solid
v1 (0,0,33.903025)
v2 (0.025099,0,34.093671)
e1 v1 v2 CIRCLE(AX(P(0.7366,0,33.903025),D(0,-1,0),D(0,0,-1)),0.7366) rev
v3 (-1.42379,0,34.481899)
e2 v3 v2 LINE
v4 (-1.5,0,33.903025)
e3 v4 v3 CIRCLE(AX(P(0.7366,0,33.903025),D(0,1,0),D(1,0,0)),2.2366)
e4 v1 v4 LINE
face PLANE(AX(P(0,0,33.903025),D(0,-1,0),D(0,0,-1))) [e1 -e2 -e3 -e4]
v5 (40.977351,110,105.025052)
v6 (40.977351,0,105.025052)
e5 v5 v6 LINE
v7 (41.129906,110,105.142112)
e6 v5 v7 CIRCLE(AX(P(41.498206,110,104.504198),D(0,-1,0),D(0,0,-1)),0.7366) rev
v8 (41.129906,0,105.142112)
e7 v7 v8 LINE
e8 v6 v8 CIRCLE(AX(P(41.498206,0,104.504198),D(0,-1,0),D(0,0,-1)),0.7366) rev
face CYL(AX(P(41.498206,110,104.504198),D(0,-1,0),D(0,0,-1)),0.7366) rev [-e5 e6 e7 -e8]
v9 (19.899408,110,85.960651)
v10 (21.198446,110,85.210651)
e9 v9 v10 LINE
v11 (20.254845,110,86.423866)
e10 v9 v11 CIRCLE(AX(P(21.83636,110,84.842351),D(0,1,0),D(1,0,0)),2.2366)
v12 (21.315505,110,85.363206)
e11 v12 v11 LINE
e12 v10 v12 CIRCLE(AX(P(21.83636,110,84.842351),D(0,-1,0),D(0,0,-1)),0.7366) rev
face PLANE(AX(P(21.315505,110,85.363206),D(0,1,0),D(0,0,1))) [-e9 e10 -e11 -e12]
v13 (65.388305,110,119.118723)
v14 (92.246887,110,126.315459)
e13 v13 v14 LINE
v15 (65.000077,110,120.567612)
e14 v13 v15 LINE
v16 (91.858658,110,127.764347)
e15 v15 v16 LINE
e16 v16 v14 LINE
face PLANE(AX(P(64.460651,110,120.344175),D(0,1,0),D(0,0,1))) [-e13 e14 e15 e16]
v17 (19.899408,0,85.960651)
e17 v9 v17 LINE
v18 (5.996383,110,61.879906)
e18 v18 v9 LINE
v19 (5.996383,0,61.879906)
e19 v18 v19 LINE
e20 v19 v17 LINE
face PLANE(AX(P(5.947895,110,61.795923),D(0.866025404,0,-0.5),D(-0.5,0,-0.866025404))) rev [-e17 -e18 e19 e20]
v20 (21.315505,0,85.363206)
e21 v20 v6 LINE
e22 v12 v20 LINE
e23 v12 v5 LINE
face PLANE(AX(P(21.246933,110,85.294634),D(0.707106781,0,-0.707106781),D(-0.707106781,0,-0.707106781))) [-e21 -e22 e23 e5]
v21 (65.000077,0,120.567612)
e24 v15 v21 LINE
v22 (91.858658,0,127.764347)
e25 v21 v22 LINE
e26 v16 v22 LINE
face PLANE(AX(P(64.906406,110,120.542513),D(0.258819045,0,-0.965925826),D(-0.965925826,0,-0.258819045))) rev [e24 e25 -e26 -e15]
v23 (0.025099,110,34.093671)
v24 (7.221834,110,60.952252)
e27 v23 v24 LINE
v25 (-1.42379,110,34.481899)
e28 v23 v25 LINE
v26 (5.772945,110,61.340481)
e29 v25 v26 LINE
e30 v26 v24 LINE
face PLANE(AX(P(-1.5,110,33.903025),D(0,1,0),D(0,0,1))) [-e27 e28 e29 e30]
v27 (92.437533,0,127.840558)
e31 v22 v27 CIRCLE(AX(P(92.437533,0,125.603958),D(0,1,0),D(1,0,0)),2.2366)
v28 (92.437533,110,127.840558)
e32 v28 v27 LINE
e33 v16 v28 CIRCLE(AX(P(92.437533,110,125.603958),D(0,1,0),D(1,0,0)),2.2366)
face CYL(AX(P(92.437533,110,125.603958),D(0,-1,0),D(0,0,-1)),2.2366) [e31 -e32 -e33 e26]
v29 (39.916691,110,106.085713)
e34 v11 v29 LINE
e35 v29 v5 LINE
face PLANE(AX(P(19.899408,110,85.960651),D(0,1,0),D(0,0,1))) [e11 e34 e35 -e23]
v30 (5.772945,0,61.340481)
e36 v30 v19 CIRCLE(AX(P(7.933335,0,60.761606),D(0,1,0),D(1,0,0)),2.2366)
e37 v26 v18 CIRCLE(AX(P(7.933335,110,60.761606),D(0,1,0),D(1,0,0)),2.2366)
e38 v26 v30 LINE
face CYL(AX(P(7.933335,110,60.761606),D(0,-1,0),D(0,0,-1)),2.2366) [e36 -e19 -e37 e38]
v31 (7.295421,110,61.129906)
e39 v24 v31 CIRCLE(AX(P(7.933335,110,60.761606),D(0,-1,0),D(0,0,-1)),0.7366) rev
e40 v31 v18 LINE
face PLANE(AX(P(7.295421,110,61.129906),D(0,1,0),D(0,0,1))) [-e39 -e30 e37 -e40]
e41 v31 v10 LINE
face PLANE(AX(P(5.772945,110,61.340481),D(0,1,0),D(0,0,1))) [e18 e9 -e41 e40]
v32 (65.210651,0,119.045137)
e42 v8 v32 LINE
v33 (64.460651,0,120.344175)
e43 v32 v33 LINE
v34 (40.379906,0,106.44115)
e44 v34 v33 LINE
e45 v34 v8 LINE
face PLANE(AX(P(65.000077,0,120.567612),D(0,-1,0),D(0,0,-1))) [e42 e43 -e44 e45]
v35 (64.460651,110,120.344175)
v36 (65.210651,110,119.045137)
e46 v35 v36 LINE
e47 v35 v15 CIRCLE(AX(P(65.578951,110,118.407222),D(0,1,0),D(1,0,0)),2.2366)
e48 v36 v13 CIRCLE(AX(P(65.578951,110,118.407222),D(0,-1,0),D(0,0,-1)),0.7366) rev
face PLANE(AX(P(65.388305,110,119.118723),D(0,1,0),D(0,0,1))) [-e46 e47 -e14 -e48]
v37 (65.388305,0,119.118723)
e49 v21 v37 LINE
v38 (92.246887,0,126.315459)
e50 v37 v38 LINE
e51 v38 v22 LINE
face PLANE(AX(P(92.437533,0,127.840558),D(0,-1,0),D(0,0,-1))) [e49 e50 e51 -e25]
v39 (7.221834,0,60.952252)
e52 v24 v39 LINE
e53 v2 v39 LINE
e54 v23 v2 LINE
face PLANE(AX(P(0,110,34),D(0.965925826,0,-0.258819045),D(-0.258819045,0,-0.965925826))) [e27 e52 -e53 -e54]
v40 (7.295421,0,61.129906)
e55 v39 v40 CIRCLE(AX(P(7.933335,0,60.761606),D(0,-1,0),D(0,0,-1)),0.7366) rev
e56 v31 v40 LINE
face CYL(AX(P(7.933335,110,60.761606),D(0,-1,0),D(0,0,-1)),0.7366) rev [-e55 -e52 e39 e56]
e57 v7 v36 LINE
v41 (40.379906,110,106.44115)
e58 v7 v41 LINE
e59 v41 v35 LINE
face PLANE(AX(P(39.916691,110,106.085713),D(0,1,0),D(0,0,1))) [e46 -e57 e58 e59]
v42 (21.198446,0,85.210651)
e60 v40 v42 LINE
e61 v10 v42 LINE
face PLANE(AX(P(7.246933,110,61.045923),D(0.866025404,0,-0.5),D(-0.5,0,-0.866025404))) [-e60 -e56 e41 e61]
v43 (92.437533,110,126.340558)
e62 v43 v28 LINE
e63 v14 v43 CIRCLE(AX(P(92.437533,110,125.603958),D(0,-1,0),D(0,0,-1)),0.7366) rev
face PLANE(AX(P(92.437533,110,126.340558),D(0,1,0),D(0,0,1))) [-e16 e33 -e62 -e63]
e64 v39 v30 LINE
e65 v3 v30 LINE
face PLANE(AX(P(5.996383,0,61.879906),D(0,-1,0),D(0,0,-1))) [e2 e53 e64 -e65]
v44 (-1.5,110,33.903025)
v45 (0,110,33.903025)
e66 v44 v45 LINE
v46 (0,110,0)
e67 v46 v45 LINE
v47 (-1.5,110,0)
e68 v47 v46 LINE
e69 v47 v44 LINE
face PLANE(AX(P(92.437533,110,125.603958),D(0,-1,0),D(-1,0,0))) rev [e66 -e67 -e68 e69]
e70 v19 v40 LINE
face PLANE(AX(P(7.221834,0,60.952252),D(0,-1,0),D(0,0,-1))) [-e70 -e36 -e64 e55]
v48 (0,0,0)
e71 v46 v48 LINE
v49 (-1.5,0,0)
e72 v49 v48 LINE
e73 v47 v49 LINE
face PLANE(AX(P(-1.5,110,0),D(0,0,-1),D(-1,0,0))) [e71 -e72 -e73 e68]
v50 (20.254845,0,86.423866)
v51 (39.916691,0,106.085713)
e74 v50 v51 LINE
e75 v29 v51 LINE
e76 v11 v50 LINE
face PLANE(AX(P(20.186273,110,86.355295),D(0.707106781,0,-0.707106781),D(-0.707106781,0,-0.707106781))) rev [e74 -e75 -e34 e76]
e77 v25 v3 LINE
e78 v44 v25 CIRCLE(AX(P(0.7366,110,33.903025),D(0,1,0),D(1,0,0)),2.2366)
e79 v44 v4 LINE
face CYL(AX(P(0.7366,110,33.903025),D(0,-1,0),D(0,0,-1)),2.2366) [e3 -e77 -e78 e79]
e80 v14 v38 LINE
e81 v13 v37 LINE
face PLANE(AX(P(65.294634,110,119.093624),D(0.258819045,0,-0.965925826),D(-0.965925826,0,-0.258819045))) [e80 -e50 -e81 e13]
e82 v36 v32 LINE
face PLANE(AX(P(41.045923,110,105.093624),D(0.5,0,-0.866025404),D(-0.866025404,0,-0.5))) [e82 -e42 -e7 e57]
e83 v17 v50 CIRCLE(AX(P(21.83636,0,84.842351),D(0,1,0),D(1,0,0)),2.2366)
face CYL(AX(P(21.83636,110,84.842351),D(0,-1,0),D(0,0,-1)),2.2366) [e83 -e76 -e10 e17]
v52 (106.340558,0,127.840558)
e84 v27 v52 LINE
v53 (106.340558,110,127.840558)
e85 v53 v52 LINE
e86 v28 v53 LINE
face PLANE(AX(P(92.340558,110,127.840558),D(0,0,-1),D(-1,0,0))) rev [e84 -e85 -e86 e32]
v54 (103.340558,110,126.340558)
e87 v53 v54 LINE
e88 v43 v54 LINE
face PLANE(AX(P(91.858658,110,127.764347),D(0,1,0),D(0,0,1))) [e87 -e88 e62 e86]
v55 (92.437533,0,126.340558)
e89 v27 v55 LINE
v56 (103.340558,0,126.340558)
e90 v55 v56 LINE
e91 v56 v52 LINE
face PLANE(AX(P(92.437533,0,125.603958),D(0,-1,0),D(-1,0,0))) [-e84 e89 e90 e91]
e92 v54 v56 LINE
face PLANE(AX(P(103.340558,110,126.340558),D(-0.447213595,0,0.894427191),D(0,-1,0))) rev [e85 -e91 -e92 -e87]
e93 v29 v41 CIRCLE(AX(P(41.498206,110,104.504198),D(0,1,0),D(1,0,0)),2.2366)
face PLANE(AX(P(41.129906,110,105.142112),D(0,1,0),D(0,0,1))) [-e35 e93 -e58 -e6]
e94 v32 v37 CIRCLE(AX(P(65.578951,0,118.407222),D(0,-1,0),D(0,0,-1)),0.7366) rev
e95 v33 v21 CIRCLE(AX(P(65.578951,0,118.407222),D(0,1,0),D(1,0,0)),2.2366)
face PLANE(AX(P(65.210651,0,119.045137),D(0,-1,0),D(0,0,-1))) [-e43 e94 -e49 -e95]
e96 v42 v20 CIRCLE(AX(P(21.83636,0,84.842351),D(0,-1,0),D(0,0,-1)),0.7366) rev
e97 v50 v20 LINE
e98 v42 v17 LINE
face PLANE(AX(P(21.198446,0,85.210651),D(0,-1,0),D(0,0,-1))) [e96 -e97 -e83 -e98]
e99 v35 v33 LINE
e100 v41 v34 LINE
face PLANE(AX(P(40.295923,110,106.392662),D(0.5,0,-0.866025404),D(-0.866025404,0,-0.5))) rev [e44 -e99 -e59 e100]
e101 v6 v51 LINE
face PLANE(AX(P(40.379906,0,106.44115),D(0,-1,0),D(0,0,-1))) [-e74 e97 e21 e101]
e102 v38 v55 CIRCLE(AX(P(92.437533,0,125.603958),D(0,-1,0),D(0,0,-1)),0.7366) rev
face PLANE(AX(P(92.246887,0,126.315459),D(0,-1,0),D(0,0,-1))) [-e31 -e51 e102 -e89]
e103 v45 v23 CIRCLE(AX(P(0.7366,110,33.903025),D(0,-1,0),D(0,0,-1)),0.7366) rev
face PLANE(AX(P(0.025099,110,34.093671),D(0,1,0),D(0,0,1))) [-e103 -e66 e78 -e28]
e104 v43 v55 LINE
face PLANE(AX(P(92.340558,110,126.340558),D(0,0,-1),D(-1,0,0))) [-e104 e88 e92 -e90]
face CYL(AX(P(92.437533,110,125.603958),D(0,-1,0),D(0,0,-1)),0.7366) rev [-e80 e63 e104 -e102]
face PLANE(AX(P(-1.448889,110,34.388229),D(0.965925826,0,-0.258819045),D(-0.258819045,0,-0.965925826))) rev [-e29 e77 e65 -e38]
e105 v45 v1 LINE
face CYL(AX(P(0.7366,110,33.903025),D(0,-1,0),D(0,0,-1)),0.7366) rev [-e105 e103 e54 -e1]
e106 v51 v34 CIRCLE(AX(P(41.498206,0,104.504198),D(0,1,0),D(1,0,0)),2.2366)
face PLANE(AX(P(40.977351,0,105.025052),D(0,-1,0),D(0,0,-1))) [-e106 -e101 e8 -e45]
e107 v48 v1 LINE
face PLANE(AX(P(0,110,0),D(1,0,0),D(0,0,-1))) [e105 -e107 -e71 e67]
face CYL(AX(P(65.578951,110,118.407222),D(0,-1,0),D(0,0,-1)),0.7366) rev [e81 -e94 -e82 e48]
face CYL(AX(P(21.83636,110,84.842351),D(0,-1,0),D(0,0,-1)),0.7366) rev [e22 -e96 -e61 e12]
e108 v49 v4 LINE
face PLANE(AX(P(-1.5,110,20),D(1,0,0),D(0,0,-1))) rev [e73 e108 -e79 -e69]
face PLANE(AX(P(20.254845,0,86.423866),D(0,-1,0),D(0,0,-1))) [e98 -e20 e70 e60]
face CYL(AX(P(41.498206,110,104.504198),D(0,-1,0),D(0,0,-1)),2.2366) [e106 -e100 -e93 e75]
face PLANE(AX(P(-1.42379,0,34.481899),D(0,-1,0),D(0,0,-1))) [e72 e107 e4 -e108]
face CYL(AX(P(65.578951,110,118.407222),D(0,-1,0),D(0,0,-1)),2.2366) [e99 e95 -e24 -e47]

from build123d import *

# Parameters (mm, degrees)
BASE_FLANGE1_DEPTH = 110
CHAMFER1_SIZE2     = 3
CHAMFER1_SIZE      = 1.5


# Sheet-metal steps are written as plain solids
with BuildPart() as part:
    # Sketch1 → Base-Flange1 (new body)
    with BuildSketch(Plane(origin=(0, 0, 0), x_dir=(1, 0, 0), z_dir=(0, 1, 0))):
        with BuildLine():
            Line((0, 0), (0, -20))
            Line((0, -20), (0, -33.90302477))
            ThreePointArc((0, -33.90302477), (0.006301715, -33.999170363), (0.025099036, -34.093670879))
            Line((0.025099036, -34.093670879), (7.221834227, -60.952252257))
            ThreePointArc((7.221834227, -60.952252257), (7.252805527, -61.043490765), (7.295420878, -61.129906149))
            Line((7.295420878, -61.129906149), (21.198445648, -85.21065143))
            ThreePointArc((21.198445648, -85.21065143), (21.25197589, -85.290765098), (21.315505105, -85.363206285))
            Line((21.315505105, -85.363206285), (40.977351294, -105.025052473))
            ThreePointArc((40.977351294, -105.025052473), (41.04979248, -105.088581688), (41.129906149, -105.14211193))
            Line((41.129906149, -105.14211193), (65.21065143, -119.0451367))
            ThreePointArc((65.21065143, -119.0451367), (65.297066813, -119.087752052), (65.388305321, -119.118723352))
            Line((65.388305321, -119.118723352), (92.246886699, -126.315458542))
            ThreePointArc((92.246886699, -126.315458542), (92.341387215, -126.334255863), (92.437532808, -126.340557578))
            Line((92.437532808, -126.340557578), (106.340557578, -126.340557578))
            Line((106.340557578, -126.340557578), (106.340557578, -127.840557578))
            Line((106.340557578, -127.840557578), (92.437532808, -127.840557578))
            ThreePointArc((92.437532808, -127.840557578), (92.145597926, -127.821423155), (91.858658132, -127.764347281))
            Line((91.858658132, -127.764347281), (65.000076753, -120.567612091))
            ThreePointArc((65.000076753, -120.567612091), (64.723041665, -120.47357135), (64.46065143, -120.344174806))
            Line((64.46065143, -120.344174806), (40.379906149, -106.441150036))
            ThreePointArc((40.379906148, -106.441150036), (40.136650336, -106.278611699), (39.916691122, -106.085712644))
            Line((39.916691122, -106.085712645), (20.254844934, -86.423866456))
            ThreePointArc((20.254844934, -86.423866456), (20.06194588, -86.203907242), (19.899407542, -85.96065143))
            Line((19.899407542, -85.96065143), (5.996382772, -61.879906149))
            ThreePointArc((5.996382772, -61.879906149), (5.866986228, -61.617515913), (5.772945487, -61.340480825))
            Line((5.772945487, -61.340480825), (-1.423789703, -34.481899447))
            ThreePointArc((-1.423789703, -34.481899447), (-1.480865577, -34.194959652), (-1.5, -33.90302477))
            Line((-1.5, -33.90302477), (-1.5, -20))
            Line((-1.5, -20), (-1.5, 0))
            Line((-1.5, 0), (0, 0))
        make_face()
    extrude(amount=BASE_FLANGE1_DEPTH)

    # Chamfer1
    chamfer1_edges = [part.edges().sort_by_distance(p)[0] for p in [
        (106.340557578, 55, 126.340557578),
    ]]
    chamfer1_side = [part.faces().sort_by_distance(p)[0] for p in [
        (106.340557578, 55, 126.370557578),
    ]]
    chamfer(chamfer1_edges, length=CHAMFER1_SIZE - 0.0001, length2=CHAMFER1_SIZE2 - 0.0001, reference=chamfer1_side[0])  # a hair under: the kernel refuses the full size


solid = part.part
